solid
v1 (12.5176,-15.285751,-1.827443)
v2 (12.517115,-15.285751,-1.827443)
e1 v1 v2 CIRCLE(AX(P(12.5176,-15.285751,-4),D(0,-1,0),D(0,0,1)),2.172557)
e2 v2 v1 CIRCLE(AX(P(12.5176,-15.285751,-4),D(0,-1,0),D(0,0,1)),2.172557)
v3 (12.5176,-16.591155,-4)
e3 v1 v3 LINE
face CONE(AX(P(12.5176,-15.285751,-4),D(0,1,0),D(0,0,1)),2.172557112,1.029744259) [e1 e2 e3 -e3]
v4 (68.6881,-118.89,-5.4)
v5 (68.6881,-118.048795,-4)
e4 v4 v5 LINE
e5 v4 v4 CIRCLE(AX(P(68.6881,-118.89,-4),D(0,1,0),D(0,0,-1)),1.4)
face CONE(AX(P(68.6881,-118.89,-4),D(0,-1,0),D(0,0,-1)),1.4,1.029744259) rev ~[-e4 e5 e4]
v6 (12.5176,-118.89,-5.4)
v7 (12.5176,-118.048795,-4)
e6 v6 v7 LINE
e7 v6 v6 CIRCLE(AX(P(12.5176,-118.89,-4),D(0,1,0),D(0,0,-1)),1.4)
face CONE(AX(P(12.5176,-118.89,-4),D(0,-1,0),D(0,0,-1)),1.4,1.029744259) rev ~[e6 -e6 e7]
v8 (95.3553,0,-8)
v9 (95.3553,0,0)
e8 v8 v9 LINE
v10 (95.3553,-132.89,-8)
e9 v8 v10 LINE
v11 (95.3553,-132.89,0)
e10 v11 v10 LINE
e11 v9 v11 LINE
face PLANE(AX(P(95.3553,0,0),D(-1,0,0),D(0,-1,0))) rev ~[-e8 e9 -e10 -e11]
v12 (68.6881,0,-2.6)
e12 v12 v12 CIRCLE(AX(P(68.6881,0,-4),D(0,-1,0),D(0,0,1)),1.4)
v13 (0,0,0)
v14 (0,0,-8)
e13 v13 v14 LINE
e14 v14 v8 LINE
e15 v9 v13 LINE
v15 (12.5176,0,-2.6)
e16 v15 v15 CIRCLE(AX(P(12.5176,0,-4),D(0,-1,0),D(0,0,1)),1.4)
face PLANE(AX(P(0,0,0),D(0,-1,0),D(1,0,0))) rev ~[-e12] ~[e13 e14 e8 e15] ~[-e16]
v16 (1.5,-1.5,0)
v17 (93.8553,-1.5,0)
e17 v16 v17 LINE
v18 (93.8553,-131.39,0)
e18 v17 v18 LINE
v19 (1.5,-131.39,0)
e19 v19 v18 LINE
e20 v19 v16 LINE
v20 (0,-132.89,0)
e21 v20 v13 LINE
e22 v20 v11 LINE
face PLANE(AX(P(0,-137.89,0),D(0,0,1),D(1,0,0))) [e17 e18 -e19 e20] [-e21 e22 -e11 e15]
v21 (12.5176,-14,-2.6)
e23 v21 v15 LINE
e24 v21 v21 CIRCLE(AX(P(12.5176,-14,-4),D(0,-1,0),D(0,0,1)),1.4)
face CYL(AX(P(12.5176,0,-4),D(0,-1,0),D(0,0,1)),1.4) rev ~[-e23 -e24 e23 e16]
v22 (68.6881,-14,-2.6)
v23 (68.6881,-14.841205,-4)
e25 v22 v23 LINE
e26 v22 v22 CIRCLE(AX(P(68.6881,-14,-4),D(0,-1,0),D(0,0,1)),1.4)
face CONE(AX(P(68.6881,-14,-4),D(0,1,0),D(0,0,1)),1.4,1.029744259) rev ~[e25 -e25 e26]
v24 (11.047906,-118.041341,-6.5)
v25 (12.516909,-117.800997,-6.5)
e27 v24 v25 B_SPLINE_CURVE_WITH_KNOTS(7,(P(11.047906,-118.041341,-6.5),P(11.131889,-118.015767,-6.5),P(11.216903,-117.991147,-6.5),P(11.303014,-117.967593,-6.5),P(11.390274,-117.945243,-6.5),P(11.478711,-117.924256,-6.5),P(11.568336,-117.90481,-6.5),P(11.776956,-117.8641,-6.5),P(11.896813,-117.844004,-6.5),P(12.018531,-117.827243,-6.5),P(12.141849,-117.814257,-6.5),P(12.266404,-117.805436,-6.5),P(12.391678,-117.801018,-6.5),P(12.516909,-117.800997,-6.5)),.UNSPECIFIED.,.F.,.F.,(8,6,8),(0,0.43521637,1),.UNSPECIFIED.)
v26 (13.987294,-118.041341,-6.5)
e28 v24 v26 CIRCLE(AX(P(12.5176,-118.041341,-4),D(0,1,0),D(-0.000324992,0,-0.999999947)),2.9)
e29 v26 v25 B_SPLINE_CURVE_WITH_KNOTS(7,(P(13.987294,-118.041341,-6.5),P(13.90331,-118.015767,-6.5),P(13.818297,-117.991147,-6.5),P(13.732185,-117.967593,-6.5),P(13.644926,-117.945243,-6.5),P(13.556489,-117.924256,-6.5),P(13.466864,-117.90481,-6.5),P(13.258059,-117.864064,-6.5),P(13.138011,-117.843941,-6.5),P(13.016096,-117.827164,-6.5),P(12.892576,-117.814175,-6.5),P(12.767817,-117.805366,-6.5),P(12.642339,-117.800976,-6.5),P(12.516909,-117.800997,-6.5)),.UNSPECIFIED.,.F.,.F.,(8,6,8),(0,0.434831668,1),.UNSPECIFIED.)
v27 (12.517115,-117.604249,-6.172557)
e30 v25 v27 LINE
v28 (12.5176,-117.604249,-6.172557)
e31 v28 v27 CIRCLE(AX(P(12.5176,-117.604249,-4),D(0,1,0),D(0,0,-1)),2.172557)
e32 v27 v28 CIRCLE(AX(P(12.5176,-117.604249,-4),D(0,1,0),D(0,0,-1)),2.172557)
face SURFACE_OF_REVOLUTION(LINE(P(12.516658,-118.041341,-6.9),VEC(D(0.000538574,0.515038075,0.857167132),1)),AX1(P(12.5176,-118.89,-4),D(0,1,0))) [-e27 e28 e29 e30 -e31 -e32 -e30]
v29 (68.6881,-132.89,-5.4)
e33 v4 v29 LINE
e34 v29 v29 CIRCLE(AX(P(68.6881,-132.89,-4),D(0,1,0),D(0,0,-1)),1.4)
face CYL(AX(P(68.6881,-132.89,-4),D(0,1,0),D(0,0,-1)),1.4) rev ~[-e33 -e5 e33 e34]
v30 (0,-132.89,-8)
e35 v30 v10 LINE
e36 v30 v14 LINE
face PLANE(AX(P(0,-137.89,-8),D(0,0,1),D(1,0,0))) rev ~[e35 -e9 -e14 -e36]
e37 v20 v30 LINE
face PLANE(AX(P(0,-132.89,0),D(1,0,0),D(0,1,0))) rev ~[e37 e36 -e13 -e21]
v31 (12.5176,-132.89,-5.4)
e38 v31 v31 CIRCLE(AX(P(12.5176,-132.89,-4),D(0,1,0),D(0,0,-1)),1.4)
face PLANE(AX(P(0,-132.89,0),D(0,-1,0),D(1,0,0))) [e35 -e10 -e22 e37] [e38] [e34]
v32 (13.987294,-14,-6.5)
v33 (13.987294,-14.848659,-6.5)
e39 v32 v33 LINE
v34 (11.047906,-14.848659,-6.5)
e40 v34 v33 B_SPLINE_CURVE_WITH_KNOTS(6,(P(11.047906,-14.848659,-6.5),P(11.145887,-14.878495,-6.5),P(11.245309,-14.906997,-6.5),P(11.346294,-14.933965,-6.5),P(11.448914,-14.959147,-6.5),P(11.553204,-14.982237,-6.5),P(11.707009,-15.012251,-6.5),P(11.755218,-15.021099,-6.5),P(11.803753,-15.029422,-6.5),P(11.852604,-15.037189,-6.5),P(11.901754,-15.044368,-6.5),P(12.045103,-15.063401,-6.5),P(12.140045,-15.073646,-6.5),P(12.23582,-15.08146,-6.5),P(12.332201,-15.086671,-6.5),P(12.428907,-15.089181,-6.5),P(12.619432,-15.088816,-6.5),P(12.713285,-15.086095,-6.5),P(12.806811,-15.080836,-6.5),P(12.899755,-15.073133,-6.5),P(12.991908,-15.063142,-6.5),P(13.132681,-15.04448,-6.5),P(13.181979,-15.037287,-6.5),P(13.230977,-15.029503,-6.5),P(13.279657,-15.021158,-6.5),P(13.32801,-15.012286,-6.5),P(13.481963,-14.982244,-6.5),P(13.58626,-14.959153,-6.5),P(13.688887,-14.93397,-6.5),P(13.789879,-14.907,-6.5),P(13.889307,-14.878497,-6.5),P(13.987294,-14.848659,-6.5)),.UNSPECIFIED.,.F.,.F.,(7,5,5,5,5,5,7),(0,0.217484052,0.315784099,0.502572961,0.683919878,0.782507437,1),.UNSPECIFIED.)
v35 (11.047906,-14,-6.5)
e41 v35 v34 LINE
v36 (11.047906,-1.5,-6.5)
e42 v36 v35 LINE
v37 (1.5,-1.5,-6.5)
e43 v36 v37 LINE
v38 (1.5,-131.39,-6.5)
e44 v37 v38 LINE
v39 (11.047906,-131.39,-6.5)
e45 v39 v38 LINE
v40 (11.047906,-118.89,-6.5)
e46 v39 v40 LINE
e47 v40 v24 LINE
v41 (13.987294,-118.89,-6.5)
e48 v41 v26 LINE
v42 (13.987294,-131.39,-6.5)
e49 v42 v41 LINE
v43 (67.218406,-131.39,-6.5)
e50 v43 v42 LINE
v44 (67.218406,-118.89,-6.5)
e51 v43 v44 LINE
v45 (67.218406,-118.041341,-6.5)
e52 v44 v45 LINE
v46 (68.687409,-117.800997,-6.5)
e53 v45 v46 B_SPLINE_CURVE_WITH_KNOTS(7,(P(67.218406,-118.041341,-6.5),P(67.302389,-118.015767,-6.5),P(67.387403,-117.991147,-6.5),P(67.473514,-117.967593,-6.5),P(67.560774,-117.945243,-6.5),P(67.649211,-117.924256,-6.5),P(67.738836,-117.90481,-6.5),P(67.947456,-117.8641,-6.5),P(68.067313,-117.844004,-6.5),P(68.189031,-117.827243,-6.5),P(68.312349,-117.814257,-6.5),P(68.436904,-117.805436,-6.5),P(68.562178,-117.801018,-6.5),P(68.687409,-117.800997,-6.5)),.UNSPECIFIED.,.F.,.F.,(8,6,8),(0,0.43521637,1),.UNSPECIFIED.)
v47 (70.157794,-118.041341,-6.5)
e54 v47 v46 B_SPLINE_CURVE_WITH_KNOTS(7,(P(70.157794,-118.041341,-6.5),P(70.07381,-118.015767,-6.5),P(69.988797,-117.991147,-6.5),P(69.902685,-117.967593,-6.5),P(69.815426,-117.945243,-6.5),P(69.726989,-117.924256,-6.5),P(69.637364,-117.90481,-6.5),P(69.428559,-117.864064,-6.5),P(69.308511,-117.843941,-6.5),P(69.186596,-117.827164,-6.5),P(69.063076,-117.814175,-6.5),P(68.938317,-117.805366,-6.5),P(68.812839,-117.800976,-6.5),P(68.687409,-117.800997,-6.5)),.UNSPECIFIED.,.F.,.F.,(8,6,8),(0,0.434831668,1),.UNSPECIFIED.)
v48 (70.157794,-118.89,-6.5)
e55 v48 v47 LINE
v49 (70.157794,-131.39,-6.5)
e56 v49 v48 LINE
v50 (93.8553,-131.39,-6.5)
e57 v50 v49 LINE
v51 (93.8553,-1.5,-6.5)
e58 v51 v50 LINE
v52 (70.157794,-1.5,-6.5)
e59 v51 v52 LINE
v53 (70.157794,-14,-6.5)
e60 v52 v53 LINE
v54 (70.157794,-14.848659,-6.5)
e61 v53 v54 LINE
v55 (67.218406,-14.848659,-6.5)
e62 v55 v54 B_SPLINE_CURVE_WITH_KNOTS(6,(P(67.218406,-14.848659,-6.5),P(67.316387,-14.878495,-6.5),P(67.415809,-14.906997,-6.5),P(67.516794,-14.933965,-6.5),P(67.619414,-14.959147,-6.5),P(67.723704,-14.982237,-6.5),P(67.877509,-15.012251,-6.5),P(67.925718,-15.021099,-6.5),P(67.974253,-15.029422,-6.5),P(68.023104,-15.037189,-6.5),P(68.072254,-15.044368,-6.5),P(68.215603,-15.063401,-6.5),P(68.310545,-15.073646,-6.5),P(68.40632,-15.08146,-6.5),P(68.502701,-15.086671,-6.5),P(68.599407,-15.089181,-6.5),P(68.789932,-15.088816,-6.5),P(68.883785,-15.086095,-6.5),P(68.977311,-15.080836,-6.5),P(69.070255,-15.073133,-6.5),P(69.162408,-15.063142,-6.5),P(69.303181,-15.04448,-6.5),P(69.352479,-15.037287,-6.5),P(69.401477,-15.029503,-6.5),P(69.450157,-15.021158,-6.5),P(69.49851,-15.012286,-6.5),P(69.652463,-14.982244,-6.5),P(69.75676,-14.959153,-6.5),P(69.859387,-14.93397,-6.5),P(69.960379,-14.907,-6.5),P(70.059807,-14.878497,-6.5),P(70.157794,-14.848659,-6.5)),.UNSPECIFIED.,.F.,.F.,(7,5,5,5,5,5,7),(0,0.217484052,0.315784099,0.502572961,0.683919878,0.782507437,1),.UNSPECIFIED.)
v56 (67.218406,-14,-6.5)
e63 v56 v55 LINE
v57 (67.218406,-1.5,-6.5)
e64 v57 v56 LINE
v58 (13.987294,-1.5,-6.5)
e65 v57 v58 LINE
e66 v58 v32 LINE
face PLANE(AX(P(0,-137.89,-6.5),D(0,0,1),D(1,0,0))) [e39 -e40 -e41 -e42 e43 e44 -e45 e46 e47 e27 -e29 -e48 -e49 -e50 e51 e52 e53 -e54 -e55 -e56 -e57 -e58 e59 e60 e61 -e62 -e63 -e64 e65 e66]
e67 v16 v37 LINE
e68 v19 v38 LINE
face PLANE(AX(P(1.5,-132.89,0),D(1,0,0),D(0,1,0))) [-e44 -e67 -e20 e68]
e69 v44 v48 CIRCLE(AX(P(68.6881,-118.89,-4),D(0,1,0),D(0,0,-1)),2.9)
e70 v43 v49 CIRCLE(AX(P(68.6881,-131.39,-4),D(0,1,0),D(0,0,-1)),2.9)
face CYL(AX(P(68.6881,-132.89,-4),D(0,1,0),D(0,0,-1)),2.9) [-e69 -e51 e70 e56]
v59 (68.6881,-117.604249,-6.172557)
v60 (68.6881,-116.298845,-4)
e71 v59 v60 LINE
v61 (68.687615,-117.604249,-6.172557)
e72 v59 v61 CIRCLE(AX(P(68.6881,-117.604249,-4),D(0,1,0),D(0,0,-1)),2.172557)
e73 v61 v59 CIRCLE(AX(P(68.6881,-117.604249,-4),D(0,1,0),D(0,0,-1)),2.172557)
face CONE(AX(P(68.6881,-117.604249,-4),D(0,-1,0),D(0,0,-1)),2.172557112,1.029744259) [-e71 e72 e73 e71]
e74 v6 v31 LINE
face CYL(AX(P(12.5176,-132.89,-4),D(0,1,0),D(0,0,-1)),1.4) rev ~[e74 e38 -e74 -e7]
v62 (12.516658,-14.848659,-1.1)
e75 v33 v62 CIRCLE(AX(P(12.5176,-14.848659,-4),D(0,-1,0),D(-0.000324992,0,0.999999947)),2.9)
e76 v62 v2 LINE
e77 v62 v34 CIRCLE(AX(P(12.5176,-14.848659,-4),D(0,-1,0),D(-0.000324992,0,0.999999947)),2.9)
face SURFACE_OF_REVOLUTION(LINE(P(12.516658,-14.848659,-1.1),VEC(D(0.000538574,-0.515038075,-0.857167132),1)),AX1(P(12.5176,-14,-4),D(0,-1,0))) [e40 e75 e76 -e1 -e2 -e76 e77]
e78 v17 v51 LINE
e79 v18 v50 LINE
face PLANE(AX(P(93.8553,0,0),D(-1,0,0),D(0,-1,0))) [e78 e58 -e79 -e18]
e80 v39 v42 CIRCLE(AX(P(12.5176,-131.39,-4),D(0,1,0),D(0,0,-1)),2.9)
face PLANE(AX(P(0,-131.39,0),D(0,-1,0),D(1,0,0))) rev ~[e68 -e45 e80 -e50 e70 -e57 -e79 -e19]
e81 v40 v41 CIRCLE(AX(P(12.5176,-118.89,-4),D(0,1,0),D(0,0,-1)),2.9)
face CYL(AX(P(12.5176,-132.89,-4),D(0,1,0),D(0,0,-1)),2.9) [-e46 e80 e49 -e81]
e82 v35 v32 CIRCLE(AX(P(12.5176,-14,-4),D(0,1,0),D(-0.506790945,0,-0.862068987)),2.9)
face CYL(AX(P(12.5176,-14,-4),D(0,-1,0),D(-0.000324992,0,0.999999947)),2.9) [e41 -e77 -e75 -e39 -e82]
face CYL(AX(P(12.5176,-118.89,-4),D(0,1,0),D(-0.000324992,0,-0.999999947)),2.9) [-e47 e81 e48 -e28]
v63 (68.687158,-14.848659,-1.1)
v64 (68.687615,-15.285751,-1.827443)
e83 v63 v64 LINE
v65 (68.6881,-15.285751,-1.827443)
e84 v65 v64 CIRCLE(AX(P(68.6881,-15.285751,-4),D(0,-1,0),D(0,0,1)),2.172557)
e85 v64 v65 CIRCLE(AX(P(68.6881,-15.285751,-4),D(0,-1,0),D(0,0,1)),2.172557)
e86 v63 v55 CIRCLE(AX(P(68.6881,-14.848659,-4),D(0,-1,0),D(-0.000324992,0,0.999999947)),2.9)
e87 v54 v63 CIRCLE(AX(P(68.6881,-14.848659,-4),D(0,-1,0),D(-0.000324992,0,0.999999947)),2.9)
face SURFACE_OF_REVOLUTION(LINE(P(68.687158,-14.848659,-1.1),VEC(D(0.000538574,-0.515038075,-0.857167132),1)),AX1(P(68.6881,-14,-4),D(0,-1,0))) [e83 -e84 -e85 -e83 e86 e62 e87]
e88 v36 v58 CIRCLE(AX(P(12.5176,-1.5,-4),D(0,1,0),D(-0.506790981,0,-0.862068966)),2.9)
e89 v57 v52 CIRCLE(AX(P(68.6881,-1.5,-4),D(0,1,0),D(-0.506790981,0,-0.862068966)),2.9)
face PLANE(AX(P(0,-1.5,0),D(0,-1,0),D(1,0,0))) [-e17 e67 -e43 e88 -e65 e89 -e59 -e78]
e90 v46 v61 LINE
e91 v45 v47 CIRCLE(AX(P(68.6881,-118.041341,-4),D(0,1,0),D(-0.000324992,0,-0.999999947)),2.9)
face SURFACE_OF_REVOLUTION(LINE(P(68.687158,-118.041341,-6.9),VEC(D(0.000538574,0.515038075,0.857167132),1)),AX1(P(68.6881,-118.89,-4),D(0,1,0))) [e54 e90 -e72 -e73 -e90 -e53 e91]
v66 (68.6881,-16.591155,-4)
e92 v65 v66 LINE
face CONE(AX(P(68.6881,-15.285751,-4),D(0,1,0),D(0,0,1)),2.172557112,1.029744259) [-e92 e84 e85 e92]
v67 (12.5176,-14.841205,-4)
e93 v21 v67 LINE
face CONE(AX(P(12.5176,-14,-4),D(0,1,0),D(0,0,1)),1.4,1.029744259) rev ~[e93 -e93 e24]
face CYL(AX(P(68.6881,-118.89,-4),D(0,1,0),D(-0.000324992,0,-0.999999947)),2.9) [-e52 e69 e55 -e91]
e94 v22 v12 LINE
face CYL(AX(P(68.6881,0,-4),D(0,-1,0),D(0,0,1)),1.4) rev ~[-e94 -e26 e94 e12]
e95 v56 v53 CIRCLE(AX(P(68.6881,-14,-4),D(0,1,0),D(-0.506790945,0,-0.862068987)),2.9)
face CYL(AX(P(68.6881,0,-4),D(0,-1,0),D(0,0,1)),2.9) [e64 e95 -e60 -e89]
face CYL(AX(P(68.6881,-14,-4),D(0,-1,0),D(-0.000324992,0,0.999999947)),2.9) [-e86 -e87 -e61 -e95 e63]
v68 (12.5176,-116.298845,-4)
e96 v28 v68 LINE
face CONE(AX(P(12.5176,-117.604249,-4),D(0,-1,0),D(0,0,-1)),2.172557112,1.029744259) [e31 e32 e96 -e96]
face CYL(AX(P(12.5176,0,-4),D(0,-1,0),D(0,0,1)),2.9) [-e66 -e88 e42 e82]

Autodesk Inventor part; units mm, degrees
ref_plane "YZ Plane" through (0, 0, 0) normal (1, 0, 0) x (0, 1, 0)
ref_plane "XZ Plane" through (0, 0, 0) normal (0, 1, 0) x (-1, 0, 0)
ref_plane "Arbeitsebene1" through (0, -137.89, 0) normal (0, 0, 1) x (1, 0, 0)
sketch "Skizze1" plane through (0, -137.89, 0) normal (0, 0, 1) x (1, 0, 0)
  line L0 (0, 0) -> (95.3553, 0) projected
  line L1 (95.3553, 0) -> (95.3553, 5) projected
  line L2 (0, 5) -> (95.3553, 5) projected
  line L3 (0, 0) -> (0, 5) projected
  line L4 (0, 137.89) -> (95.3553, 137.89) projected
  line L5 (95.3553, 137.89) -> (95.3553, 142.89) projected
  line L6 (0, 142.89) -> (95.3553, 142.89) projected
  line L7 (0, 137.89) -> (0, 142.89) projected
  line L8 (95.3553, 5) -> (0, 5)
  line L9 (0, 5) -> (0, 137.89)
  line L10 (0, 137.89) -> (95.3553, 137.89)
  line L11 (95.3553, 137.89) -> (95.3553, 5)
ref_plane "Arbeitsebene2" through (0, 0, -8) normal (0, 0, -1) x (0, 1, 0)
extrude "Extrusion1" add sketch "Skizze1" against normal up to surface (8 mm away) contours L9 L4 L11 L2
sketch "Skizze2" plane through (0, 0, 0) normal (0, 1, 0) x (1, 0, 0)
  circle A0 centre (68.6881, 4) radius 1.4 projected
  circle A1 centre (12.5176, 4) radius 1.4 projected
  line L0 (0, 0) -> (95.3553, 0) projected
  line L1 (95.3553, 0) -> (95.3553, 68) projected
  line L2 (95.3553, 68) -> (42.0208, 121.3345) projected
  line L3 (42.0208, 121.3345) -> (36.364, 115.6777) projected
  line L4 (36.364, 115.6777) -> (87.3553, 64.6863) projected
  line L5 (87.3553, 64.6863) -> (87.3553, 8) projected
  line L6 (87.3553, 8) -> (0, 8) projected
  line L7 (0, 8) -> (0, 0) projected
  circle A2 centre (42.0208, 115.6777) radius 1.49 projected
  circle A3 centre (72.0208, 85.6777) radius 1.4 projected
  circle A4 centre (57.0208, 100.6777) radius 1.4 projected
hole "Bohrung1" at (68.6881, 0, -4) at (12.5176, 0, -4) direction (0, -1, 0) diameter 2.8 depth 14 tip angle 118
sketch "Skizze3" plane through (0, -132.89, 0) normal (0, -1, 0) x (1, 0, 0)
  circle A0 centre (68.6881, -4) radius 1.4 projected
  circle A1 centre (12.5176, -4) radius 1.4 projected
  line L0 (0, 0) -> (95.3553, 0) projected
  line L1 (0, -8) -> (0, 0) projected
  line L2 (87.3553, -8) -> (0, -8) projected
  line L3 (87.3553, -64.6863) -> (87.3553, -8) projected
  line L4 (36.364, -115.6777) -> (87.3553, -64.6863) projected
  line L5 (42.0208, -121.3345) -> (36.364, -115.6777) projected
  line L6 (95.3553, -68) -> (42.0208, -121.3345) projected
  line L7 (95.3553, 0) -> (95.3553, -68) projected
  circle A2 centre (42.0208, -115.6777) radius 1.49 projected
  circle A3 centre (72.0208, -85.6777) radius 1.4 projected
  circle A4 centre (57.0208, -100.6777) radius 1.4 projected
hole "Bohrung2" at (68.6881, -132.89, -4) at (12.5176, -132.89, -4) direction (0, 1, 0) diameter 2.8 depth 14 tip angle 118
shell "Wandung1" thickness 1.5 removed faces 1 at (63.5702, -44.2967, 0)
properties part number "NematostellaImager_illuminationplate"
